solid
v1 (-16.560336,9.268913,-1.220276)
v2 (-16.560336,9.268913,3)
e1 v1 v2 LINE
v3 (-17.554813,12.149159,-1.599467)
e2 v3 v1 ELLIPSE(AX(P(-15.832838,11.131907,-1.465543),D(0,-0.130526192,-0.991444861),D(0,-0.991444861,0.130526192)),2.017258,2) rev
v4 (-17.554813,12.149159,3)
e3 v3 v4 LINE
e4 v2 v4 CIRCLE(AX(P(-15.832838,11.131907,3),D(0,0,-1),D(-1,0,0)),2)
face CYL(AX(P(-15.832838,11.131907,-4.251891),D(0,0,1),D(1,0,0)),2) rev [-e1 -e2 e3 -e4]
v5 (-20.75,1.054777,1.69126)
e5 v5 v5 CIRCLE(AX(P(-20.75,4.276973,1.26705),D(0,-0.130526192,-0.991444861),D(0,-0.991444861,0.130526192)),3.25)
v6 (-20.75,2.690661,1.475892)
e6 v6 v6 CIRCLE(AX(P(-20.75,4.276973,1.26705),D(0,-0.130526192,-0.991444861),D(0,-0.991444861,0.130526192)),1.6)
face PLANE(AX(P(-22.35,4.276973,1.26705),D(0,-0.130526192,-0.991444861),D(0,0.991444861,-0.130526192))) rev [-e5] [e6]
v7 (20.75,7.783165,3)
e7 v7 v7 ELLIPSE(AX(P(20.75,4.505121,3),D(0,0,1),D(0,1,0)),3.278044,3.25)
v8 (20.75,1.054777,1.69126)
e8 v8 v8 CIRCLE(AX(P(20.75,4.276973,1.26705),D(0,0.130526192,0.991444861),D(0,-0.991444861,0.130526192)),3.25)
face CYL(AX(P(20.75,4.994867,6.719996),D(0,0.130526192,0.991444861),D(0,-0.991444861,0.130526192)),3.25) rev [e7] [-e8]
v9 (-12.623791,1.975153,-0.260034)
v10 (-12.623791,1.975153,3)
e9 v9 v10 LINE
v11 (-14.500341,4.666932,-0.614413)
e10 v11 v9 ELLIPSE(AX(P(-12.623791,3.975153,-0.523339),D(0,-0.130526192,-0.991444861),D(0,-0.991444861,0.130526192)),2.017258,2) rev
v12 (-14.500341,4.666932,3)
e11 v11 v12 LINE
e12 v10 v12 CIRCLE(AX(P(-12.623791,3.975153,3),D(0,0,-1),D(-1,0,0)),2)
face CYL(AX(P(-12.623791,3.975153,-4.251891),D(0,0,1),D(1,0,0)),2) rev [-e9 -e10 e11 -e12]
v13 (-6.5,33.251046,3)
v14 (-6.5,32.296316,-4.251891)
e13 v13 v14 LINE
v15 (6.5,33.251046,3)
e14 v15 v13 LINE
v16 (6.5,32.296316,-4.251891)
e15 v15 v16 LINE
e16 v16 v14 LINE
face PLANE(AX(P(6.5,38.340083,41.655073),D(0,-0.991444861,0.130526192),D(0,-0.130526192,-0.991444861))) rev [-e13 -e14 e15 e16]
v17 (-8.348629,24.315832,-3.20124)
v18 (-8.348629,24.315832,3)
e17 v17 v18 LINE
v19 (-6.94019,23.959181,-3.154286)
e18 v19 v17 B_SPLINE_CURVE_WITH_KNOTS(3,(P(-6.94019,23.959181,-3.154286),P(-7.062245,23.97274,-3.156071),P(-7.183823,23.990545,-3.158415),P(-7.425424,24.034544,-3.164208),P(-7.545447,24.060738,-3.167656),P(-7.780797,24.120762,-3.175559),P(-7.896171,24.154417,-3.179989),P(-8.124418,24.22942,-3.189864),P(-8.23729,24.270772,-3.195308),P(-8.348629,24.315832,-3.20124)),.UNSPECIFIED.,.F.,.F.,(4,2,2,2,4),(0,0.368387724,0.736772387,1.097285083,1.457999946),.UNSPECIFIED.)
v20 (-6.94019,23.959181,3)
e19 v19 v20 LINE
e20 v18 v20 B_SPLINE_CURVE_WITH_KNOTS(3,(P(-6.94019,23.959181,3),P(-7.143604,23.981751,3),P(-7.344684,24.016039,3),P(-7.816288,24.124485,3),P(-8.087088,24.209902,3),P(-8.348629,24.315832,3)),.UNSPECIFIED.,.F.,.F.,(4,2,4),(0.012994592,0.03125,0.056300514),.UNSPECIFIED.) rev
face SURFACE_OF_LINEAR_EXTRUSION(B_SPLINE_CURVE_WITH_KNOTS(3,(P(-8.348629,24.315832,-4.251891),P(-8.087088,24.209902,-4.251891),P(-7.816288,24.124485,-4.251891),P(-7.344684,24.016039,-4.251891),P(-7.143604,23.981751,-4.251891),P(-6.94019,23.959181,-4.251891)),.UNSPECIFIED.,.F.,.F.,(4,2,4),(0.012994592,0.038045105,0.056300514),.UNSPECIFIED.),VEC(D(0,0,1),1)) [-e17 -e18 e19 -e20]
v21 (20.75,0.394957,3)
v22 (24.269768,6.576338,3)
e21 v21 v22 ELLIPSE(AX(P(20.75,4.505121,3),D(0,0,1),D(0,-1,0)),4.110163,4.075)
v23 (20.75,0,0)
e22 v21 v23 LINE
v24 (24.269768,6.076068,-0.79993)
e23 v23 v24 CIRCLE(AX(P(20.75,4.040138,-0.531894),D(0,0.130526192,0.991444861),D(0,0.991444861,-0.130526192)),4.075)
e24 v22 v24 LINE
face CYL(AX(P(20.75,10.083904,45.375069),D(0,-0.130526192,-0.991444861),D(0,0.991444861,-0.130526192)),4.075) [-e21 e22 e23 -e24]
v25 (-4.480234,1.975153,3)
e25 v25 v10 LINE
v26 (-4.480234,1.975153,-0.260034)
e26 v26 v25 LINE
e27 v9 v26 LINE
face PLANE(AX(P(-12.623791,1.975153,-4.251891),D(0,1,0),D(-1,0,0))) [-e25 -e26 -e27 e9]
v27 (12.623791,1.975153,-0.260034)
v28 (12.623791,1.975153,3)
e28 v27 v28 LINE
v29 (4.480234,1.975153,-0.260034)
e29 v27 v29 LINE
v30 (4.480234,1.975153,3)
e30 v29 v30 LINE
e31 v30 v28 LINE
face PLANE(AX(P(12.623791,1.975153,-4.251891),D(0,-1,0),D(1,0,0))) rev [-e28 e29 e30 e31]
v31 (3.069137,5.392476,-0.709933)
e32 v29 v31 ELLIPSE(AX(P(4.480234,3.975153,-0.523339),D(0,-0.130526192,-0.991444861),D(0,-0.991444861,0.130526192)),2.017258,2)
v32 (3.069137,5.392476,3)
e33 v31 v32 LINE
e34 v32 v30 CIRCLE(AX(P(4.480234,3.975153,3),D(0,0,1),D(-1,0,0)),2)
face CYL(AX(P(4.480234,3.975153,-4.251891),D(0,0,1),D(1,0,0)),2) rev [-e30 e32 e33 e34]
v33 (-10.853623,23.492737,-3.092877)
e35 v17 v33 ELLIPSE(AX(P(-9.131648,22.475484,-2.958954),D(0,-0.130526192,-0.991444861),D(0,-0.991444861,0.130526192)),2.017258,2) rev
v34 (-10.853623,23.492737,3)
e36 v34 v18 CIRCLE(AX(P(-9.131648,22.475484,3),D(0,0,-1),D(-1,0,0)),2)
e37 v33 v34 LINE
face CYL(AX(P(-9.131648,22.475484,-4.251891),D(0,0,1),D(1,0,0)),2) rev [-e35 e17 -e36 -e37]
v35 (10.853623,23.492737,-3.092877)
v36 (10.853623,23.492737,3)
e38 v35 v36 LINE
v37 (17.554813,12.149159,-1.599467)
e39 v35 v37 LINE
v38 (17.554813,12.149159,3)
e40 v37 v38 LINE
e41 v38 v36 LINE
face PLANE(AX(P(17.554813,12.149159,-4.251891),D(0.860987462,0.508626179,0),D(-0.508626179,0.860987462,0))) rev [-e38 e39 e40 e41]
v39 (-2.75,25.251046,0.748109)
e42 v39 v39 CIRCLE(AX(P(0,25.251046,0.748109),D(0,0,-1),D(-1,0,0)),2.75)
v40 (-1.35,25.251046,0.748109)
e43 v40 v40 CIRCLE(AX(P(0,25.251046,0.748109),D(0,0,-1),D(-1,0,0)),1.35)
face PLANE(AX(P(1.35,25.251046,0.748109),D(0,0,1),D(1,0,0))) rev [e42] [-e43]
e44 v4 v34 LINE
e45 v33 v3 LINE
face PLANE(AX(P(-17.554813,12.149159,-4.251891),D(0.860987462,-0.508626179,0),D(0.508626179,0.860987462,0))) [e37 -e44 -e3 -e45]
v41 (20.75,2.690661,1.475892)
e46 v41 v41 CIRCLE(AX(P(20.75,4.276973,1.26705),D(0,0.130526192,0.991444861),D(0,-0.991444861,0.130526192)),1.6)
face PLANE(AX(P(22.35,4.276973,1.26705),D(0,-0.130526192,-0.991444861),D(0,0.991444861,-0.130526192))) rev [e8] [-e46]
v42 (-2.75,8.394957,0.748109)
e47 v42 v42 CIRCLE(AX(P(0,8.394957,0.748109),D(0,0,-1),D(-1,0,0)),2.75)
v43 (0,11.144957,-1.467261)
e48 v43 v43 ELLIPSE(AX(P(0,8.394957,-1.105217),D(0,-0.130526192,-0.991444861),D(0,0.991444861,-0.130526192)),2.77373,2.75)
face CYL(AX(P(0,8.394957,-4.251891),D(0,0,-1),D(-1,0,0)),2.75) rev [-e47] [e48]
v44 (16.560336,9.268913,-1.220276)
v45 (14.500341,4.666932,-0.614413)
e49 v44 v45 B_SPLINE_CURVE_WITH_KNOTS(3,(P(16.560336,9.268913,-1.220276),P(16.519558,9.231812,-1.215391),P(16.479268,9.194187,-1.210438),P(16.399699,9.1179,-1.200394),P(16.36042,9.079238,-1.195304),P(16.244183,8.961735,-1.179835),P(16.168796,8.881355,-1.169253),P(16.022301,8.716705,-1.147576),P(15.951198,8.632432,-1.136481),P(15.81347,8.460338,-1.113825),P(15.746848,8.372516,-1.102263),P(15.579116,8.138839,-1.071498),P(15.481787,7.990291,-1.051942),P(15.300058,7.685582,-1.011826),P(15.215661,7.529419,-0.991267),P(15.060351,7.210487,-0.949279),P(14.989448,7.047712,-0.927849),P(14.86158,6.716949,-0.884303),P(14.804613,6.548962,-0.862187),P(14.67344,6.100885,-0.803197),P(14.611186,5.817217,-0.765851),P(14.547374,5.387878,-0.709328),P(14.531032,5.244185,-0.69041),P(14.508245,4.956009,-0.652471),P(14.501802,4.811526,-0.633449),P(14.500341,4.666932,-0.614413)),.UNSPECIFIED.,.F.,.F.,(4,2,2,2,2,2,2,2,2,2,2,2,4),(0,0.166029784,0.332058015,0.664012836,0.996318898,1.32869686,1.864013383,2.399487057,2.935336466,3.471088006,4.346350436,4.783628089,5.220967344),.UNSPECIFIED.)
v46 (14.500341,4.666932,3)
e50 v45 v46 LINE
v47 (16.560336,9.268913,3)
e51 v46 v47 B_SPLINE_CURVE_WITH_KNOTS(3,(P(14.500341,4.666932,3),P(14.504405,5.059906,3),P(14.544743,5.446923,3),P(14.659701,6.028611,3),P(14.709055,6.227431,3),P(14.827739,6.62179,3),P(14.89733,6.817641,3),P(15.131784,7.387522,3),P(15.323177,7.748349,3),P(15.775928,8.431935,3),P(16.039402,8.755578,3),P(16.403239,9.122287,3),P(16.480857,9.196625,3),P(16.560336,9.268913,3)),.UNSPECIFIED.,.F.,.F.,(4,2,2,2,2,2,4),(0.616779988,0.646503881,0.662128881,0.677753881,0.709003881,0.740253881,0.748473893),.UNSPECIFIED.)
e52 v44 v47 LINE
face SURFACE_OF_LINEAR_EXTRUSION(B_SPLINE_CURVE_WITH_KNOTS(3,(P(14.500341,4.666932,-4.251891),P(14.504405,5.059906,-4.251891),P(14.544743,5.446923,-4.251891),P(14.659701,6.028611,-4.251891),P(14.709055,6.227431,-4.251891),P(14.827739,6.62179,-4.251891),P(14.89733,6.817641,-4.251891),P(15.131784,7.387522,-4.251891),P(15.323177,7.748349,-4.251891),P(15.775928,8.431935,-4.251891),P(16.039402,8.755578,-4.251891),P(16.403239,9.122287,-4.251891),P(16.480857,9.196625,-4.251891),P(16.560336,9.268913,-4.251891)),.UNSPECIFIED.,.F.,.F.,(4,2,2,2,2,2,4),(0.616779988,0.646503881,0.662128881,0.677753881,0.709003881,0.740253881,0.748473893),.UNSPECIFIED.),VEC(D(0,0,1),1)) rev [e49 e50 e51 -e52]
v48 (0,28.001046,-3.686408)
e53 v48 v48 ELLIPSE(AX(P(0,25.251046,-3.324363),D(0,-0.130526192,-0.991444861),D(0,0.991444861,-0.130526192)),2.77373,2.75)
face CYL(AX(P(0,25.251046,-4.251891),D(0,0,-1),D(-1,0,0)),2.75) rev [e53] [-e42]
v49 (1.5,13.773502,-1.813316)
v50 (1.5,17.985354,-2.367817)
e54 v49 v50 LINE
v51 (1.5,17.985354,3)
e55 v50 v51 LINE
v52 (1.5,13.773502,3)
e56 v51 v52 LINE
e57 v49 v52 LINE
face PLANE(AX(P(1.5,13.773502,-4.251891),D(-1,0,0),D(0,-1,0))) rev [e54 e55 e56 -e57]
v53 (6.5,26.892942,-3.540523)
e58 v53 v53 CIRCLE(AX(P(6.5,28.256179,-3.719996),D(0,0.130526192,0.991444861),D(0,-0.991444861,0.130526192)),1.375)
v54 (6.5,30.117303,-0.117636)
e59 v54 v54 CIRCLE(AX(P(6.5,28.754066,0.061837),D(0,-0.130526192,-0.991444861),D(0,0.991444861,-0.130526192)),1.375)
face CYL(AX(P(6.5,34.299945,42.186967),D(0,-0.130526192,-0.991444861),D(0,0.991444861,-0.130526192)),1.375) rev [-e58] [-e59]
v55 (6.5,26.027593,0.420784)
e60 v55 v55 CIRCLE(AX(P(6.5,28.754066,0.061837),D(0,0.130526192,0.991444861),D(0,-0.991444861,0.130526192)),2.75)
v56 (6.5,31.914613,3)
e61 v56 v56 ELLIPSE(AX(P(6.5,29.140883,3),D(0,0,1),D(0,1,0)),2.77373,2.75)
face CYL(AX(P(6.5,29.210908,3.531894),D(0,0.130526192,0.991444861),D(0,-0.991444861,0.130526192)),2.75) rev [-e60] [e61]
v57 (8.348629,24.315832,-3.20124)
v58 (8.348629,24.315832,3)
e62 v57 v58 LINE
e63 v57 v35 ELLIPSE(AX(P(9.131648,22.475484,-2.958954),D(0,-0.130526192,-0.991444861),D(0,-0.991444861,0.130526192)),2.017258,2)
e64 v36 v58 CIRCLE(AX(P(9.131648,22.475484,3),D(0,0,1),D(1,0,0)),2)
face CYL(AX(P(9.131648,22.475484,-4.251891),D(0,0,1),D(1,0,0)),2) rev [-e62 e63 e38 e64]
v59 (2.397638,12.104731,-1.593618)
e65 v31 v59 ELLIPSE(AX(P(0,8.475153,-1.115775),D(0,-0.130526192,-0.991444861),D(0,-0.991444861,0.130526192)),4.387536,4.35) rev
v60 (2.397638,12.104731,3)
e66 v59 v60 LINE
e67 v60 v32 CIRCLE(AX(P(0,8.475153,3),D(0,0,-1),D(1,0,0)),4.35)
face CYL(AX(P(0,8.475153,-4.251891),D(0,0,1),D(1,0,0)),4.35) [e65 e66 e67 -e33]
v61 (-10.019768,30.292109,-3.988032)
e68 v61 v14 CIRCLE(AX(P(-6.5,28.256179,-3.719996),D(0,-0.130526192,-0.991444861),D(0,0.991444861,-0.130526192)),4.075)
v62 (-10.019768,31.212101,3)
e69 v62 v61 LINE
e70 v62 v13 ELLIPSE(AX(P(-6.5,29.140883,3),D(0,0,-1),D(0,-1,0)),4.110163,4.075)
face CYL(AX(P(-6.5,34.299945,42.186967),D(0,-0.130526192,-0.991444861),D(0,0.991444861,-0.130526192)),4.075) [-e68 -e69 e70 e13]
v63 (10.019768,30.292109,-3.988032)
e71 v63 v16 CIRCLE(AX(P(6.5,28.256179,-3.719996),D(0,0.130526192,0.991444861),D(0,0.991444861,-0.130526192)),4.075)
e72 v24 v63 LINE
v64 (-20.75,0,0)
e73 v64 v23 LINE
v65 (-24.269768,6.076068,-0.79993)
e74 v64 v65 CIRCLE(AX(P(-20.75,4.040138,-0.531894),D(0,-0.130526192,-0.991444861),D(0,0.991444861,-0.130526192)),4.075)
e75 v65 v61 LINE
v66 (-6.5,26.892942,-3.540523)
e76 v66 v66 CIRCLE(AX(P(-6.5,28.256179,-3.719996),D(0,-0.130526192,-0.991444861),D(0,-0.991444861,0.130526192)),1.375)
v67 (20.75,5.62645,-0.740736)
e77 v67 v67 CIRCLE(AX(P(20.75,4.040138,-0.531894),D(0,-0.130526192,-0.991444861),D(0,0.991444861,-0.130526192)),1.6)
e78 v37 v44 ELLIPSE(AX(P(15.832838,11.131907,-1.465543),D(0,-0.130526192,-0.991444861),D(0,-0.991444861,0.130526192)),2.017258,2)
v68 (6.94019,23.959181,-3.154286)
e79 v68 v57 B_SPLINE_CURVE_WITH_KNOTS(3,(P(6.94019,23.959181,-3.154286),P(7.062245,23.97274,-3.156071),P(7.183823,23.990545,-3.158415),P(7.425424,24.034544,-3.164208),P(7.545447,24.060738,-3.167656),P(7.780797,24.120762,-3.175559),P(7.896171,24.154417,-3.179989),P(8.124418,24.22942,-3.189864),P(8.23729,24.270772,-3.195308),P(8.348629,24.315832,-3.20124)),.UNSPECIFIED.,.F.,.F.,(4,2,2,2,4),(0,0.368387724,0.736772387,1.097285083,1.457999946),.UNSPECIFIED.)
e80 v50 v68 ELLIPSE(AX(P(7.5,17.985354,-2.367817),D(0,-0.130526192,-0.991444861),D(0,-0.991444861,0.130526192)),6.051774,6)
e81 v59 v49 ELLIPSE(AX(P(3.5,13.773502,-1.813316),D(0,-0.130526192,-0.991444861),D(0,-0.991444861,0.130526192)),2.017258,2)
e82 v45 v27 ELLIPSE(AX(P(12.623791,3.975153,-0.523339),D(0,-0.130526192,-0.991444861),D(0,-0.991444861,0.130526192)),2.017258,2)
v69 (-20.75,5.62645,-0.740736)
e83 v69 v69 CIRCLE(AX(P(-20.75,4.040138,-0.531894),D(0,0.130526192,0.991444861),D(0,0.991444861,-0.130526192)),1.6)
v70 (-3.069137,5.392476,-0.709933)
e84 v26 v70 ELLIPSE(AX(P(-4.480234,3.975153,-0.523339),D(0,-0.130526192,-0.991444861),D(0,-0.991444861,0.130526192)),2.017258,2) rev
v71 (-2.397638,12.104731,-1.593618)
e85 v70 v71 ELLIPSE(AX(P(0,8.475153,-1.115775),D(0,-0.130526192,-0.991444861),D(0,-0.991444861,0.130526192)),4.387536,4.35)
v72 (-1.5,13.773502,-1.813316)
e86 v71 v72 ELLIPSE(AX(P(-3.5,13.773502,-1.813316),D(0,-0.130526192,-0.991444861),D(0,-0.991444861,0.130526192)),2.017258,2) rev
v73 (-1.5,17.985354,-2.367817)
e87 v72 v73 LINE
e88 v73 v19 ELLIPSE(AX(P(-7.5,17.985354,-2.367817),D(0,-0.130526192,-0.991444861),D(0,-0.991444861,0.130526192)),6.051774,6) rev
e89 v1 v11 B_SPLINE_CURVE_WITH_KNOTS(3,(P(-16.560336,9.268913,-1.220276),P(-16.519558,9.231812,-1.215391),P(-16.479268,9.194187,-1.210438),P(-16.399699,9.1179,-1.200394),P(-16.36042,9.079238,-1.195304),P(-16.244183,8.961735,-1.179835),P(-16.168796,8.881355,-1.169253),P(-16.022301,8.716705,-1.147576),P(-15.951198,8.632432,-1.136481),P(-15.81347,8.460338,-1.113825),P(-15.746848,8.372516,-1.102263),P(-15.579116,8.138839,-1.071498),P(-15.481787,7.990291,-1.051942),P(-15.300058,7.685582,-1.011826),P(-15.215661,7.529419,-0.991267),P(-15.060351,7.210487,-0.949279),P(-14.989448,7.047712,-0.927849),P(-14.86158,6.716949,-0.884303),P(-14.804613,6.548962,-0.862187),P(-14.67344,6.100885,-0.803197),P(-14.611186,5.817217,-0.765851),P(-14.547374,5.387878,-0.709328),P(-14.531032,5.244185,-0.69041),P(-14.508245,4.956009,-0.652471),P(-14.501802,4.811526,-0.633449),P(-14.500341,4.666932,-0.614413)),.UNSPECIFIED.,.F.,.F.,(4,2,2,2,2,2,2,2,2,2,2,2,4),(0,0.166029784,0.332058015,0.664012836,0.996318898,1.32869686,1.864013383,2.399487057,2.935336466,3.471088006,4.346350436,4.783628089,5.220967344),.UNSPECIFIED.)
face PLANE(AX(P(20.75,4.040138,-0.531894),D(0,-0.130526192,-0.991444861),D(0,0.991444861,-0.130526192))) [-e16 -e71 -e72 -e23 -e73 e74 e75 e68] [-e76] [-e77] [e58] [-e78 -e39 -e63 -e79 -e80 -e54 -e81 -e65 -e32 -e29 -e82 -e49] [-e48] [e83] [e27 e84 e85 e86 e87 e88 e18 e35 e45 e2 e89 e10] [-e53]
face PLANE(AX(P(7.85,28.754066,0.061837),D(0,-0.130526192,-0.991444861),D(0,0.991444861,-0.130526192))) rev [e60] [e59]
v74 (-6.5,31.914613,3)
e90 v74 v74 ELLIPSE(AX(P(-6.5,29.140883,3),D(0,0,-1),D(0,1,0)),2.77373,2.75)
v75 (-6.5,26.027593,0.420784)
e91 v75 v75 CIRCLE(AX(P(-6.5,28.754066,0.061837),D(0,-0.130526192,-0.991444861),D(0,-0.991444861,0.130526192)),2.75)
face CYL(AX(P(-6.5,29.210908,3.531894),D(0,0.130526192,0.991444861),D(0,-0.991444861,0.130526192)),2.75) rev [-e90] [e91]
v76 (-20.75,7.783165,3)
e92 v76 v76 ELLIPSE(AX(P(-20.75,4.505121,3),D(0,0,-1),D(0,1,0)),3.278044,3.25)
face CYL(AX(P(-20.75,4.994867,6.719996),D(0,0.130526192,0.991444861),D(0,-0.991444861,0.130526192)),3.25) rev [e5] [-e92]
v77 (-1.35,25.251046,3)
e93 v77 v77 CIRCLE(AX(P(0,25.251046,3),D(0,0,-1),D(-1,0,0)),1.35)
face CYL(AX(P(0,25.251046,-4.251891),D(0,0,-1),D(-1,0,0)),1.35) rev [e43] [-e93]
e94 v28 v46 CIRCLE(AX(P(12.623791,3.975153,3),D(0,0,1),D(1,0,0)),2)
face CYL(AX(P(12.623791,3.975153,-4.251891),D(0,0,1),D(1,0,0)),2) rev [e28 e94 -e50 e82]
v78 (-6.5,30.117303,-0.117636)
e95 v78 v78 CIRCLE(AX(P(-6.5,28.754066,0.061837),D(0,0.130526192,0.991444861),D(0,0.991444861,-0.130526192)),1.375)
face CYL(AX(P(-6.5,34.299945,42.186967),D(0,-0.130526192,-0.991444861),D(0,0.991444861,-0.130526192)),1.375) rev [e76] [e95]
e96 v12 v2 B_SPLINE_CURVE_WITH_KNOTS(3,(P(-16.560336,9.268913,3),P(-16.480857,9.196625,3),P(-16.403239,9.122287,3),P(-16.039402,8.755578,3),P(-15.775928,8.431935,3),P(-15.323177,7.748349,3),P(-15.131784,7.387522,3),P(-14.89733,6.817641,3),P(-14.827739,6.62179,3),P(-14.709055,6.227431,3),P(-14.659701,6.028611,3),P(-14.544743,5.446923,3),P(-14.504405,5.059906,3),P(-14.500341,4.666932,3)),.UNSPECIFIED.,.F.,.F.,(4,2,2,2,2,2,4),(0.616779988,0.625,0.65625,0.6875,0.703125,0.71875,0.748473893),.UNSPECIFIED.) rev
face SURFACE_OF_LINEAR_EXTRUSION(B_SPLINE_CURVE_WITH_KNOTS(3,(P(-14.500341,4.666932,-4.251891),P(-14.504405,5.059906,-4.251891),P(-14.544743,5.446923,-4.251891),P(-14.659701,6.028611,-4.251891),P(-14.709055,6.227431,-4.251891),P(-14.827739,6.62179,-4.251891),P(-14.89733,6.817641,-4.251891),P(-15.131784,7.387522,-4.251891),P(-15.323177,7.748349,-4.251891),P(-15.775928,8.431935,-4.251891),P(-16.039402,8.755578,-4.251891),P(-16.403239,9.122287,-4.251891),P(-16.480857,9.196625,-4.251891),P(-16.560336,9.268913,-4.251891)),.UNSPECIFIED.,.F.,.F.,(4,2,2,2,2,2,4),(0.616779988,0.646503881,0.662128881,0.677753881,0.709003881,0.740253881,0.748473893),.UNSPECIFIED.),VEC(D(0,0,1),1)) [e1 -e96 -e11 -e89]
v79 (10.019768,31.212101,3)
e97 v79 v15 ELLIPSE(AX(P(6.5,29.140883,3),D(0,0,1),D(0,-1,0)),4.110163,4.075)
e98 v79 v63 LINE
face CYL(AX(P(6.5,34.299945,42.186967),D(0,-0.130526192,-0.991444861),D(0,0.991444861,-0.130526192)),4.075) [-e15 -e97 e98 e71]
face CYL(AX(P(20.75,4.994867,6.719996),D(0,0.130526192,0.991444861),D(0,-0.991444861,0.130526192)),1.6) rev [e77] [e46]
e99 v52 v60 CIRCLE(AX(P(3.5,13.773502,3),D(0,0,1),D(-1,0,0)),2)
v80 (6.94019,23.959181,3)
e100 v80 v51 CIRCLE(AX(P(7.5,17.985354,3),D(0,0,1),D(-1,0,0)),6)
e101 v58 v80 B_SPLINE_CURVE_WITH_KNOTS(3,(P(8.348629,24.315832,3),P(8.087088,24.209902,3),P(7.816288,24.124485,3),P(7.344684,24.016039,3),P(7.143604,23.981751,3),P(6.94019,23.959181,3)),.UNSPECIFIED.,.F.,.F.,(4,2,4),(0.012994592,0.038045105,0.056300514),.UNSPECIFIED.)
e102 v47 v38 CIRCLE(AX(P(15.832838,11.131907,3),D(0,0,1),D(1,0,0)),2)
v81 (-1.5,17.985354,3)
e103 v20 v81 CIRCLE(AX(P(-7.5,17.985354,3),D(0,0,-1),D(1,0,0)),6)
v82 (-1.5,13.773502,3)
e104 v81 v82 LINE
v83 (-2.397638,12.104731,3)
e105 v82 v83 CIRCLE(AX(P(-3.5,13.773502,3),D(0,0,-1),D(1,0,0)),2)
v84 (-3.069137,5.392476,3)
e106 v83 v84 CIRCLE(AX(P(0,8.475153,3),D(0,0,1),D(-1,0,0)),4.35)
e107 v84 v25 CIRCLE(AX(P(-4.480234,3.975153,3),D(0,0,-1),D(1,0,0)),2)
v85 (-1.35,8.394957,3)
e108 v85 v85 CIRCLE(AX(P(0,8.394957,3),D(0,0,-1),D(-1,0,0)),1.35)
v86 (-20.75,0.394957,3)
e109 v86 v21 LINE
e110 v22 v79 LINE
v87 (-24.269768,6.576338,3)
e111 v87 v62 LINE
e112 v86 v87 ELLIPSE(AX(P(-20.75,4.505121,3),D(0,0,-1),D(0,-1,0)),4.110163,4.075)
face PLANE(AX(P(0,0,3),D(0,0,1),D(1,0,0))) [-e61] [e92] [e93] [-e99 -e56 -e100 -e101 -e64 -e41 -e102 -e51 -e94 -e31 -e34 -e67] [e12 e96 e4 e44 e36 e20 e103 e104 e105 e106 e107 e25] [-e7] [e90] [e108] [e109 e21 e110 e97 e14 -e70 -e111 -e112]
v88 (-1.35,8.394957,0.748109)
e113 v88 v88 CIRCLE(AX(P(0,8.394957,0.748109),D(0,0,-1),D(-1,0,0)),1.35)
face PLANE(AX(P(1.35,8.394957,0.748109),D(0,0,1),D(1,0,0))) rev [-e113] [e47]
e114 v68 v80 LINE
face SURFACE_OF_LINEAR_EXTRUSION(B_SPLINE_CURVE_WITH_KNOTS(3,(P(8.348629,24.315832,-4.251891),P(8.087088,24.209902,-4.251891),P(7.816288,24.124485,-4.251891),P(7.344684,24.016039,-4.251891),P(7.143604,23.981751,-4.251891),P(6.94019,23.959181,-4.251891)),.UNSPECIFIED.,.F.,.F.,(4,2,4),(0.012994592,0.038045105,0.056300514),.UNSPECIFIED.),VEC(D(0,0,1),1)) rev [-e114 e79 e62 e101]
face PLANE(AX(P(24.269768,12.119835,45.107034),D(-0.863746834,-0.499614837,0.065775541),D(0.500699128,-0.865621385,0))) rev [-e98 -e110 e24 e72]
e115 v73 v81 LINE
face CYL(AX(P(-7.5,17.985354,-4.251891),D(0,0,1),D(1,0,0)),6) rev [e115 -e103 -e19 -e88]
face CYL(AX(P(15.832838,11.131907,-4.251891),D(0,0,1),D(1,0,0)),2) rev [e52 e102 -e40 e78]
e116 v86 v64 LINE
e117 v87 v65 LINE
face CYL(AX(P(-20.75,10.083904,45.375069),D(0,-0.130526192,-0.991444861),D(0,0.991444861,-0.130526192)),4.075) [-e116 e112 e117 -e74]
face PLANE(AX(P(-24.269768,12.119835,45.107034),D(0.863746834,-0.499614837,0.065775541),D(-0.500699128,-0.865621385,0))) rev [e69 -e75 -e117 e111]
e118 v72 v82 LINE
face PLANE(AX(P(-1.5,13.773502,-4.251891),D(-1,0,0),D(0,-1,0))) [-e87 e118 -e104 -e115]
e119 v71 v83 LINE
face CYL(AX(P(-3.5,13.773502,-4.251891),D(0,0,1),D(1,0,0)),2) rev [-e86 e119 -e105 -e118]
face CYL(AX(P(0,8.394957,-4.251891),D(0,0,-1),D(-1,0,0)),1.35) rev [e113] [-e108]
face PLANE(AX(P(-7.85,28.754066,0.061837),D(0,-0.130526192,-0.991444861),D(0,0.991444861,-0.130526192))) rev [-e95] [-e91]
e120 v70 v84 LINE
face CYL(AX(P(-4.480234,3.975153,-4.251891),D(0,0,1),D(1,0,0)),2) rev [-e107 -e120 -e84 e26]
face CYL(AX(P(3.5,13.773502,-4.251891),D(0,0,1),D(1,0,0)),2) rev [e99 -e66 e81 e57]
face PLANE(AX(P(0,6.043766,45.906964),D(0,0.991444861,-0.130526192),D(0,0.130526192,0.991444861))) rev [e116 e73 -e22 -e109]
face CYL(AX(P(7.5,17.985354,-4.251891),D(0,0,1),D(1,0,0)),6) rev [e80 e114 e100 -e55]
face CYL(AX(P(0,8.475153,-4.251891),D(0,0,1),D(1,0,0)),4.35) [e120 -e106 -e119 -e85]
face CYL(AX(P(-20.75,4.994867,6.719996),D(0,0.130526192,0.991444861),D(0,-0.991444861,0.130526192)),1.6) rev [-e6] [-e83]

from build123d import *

# Parameters (mm, degrees)
BOSS_EXTRUDE1_REACH              = 47.134
SKETCH1_R                        = 1.375
SKETCH1_R_2                      = 1.575
CBORE_FOR_M3_SHCS1_D             = 3.2
CBORE_FOR_M3_SHCS1_CBORE_D       = 6.5
CBORE_FOR_M3_SHCS1_CBORE_DEPTH   = 5.5
CBORE_FOR_M2_5_SHCS2_D           = 2.7
CBORE_FOR_M2_5_SHCS2_CBORE_D     = 5.5
CBORE_FOR_M2_5_SHCS2_CBORE_DEPTH = 3.5
CBORE_FOR_M2_5_SHCS1_D           = 2.7
CBORE_FOR_M2_5_SHCS1_CBORE_D     = 5.5
CBORE_FOR_M2_5_SHCS1_CBORE_DEPTH = 5
CUT_EXTRUDE2_DEPTH               = 43.124845356


with BuildPart() as part:
    # Boss-Extrude1: up to this plane
    boss_extrude1_end = Plane(origin=(0, 0, 3), z_dir=(0, 0, 1))
    # Sketch1 → Boss-Extrude1 (new, up to the surface)
    with BuildSketch(Plane(origin=(0, 0, 0), x_dir=(1, 0, 0), z_dir=(0, 0.13052619222005188, 0.9914448613738104)), mode=Mode.PRIVATE) as boss_extrude1_sk1:
        with BuildLine():
            Line((0, 28.5), (0, 0))
            Line((0, 0), (20.75, 0))
            ThreePointArc((20.75, 0), (24.283668849, 2.045514976), (24.269768349, 6.128498422))
            Line((24.269768349, 6.128498422), (10.019768349, 30.553498422))
            ThreePointArc((10.019768349, 30.553498422), (8.529485024, 32.033668849), (6.5, 32.575))
            Line((6.5, 32.575), (0, 32.575))
            Line((0, 32.575), (0, 28.5))
        make_face()
        with Locations((6.5, 28.5)):
            Circle(SKETCH1_R, mode=Mode.SUBTRACT)
        with Locations((20.75, 4.075)):
            Circle(SKETCH1_R_2, mode=Mode.SUBTRACT)
    boss_extrude1_tool1 = split(extrude(boss_extrude1_sk1.sketch, amount=BOSS_EXTRUDE1_REACH, mode=Mode.PRIVATE), bisect_by=boss_extrude1_end, keep=Keep.BOTH, mode=Mode.PRIVATE)
    add(boss_extrude1_tool1.solids().sort_by_distance((9.577344, 13.541974, -1.782835))[0])

    # CBORE for M3 SHCS1 (through all)
    with Locations(Plane(origin=(0, 0.954729524, 7.251890712), x_dir=(-1, 0, 0), z_dir=(0, 0.1305261922200519, 0.9914448613738105))):
        with Locations((-20.75, -4.075)):
            CounterBoreHole(CBORE_FOR_M3_SHCS1_D / 2, CBORE_FOR_M3_SHCS1_CBORE_D / 2, CBORE_FOR_M3_SHCS1_CBORE_DEPTH)

    # CBORE for M2.5 SHCS2 (through all)
    with Locations(Plane(origin=(0, 0.954729524, 7.251890712), x_dir=(-1, 0, 0), z_dir=(0, 0.1305261922200519, 0.9914448613738105))):
        with Locations((-6.5, -28.5)):
            CounterBoreHole(CBORE_FOR_M2_5_SHCS2_D / 2, CBORE_FOR_M2_5_SHCS2_CBORE_D / 2, CBORE_FOR_M2_5_SHCS2_CBORE_DEPTH)

    # Mirror1: part across plane


with BuildPart() as part_1:
    add(part.part)
    add(part.part.mirror(Plane(origin=(0, 0, 0), x_dir=(0, 0, 1), z_dir=(1, 0, 0))))

    # CBORE for M2.5 SHCS1 (through all)
    with Locations(Plane(origin=(0, 0, -4.251890712), x_dir=(1, 0, 0), z_dir=(0, 0, -1))):
        with Locations((0, -25.251045884), (0, -8.394957493)):
            CounterBoreHole(CBORE_FOR_M2_5_SHCS1_D / 2, CBORE_FOR_M2_5_SHCS1_CBORE_D / 2, CBORE_FOR_M2_5_SHCS1_CBORE_DEPTH)

    # Sketch23 → Cut-Extrude2 (cut, through all)
    with BuildSketch(Plane.XY.offset(3)):
        with BuildLine():
            Line((12.623790508, 1.975153321), (4.480234369, 1.975153321))
            ThreePointArc((4.480234369, 1.975153321), (2.631634132, 3.211820389), (3.06913693, 5.392476156))
            ThreePointArc((3.06913693, 5.392476156), (4.328394301, 8.908169224), (2.397637796, 12.104730845))
            ThreePointArc((2.397637796, 12.104730845), (1.738647621, 12.826064632), (1.5, 13.773502121))
            Line((1.5, 13.773502121), (1.5, 17.985353527))
            ThreePointArc((1.5, 17.985353527), (3.063849532, 22.025225929), (6.940189675, 23.95918081))
            add(Edge.make_bspline(
                [(6.940189675, 23.95918081), (7.143604146, 23.981751029), (7.344683783, 24.016038635), (7.816288161, 24.124484553), (8.087087758, 24.209901876), (8.34862861, 24.315832383)],
                knots=[0.012994592, 0.012994592, 0.012994592, 0.012994592, 0.03125, 0.03125, 0.056300514, 0.056300514, 0.056300514, 0.056300514], degree=3))
            ThreePointArc((8.34862861, 24.315832383), (9.755972375, 24.375542014), (10.853622853, 23.492736744))
            Line((10.853622853, 23.492736744), (17.554812696, 12.149159325))
            ThreePointArc((17.554812696, 12.149159325), (17.723323038, 10.479170001), (16.560336213, 9.268913106))
            add(Edge.make_bspline(
                [(16.560336213, 9.268913106), (16.480857204, 9.196624751), (16.403239059, 9.122286883), (16.039402336, 8.755578367), (15.775927636, 8.431934638), (15.323177175, 7.748349007), (15.13178367, 7.387522034), (14.897329537, 6.817641357), (14.827739454, 6.621790337), (14.70905517, 6.227430948), (14.65970092, 6.02861076), (14.54474316, 5.446923453), (14.504405456, 5.059906471), (14.500341277, 4.666931627)],
                knots=[0.616779988, 0.616779988, 0.616779988, 0.616779988, 0.625, 0.625, 0.65625, 0.65625, 0.6875, 0.6875, 0.703125, 0.703125, 0.71875, 0.71875, 0.748473893, 0.748473893, 0.748473893, 0.748473893], degree=3))
            ThreePointArc((14.500341277, 4.666931627), (14.264454492, 2.831378127), (12.623790508, 1.975153321))
        make_face()
    cut_extrude2 = extrude(amount=-CUT_EXTRUDE2_DEPTH, mode=Mode.SUBTRACT)

    # Mirror2: Cut-Extrude2 across plane
    add(cut_extrude2.mirror(Plane(origin=(0, 0, 0), x_dir=(0, 0, 1), z_dir=(1, 0, 0))), mode=Mode.SUBTRACT)


solid = part_1.part
